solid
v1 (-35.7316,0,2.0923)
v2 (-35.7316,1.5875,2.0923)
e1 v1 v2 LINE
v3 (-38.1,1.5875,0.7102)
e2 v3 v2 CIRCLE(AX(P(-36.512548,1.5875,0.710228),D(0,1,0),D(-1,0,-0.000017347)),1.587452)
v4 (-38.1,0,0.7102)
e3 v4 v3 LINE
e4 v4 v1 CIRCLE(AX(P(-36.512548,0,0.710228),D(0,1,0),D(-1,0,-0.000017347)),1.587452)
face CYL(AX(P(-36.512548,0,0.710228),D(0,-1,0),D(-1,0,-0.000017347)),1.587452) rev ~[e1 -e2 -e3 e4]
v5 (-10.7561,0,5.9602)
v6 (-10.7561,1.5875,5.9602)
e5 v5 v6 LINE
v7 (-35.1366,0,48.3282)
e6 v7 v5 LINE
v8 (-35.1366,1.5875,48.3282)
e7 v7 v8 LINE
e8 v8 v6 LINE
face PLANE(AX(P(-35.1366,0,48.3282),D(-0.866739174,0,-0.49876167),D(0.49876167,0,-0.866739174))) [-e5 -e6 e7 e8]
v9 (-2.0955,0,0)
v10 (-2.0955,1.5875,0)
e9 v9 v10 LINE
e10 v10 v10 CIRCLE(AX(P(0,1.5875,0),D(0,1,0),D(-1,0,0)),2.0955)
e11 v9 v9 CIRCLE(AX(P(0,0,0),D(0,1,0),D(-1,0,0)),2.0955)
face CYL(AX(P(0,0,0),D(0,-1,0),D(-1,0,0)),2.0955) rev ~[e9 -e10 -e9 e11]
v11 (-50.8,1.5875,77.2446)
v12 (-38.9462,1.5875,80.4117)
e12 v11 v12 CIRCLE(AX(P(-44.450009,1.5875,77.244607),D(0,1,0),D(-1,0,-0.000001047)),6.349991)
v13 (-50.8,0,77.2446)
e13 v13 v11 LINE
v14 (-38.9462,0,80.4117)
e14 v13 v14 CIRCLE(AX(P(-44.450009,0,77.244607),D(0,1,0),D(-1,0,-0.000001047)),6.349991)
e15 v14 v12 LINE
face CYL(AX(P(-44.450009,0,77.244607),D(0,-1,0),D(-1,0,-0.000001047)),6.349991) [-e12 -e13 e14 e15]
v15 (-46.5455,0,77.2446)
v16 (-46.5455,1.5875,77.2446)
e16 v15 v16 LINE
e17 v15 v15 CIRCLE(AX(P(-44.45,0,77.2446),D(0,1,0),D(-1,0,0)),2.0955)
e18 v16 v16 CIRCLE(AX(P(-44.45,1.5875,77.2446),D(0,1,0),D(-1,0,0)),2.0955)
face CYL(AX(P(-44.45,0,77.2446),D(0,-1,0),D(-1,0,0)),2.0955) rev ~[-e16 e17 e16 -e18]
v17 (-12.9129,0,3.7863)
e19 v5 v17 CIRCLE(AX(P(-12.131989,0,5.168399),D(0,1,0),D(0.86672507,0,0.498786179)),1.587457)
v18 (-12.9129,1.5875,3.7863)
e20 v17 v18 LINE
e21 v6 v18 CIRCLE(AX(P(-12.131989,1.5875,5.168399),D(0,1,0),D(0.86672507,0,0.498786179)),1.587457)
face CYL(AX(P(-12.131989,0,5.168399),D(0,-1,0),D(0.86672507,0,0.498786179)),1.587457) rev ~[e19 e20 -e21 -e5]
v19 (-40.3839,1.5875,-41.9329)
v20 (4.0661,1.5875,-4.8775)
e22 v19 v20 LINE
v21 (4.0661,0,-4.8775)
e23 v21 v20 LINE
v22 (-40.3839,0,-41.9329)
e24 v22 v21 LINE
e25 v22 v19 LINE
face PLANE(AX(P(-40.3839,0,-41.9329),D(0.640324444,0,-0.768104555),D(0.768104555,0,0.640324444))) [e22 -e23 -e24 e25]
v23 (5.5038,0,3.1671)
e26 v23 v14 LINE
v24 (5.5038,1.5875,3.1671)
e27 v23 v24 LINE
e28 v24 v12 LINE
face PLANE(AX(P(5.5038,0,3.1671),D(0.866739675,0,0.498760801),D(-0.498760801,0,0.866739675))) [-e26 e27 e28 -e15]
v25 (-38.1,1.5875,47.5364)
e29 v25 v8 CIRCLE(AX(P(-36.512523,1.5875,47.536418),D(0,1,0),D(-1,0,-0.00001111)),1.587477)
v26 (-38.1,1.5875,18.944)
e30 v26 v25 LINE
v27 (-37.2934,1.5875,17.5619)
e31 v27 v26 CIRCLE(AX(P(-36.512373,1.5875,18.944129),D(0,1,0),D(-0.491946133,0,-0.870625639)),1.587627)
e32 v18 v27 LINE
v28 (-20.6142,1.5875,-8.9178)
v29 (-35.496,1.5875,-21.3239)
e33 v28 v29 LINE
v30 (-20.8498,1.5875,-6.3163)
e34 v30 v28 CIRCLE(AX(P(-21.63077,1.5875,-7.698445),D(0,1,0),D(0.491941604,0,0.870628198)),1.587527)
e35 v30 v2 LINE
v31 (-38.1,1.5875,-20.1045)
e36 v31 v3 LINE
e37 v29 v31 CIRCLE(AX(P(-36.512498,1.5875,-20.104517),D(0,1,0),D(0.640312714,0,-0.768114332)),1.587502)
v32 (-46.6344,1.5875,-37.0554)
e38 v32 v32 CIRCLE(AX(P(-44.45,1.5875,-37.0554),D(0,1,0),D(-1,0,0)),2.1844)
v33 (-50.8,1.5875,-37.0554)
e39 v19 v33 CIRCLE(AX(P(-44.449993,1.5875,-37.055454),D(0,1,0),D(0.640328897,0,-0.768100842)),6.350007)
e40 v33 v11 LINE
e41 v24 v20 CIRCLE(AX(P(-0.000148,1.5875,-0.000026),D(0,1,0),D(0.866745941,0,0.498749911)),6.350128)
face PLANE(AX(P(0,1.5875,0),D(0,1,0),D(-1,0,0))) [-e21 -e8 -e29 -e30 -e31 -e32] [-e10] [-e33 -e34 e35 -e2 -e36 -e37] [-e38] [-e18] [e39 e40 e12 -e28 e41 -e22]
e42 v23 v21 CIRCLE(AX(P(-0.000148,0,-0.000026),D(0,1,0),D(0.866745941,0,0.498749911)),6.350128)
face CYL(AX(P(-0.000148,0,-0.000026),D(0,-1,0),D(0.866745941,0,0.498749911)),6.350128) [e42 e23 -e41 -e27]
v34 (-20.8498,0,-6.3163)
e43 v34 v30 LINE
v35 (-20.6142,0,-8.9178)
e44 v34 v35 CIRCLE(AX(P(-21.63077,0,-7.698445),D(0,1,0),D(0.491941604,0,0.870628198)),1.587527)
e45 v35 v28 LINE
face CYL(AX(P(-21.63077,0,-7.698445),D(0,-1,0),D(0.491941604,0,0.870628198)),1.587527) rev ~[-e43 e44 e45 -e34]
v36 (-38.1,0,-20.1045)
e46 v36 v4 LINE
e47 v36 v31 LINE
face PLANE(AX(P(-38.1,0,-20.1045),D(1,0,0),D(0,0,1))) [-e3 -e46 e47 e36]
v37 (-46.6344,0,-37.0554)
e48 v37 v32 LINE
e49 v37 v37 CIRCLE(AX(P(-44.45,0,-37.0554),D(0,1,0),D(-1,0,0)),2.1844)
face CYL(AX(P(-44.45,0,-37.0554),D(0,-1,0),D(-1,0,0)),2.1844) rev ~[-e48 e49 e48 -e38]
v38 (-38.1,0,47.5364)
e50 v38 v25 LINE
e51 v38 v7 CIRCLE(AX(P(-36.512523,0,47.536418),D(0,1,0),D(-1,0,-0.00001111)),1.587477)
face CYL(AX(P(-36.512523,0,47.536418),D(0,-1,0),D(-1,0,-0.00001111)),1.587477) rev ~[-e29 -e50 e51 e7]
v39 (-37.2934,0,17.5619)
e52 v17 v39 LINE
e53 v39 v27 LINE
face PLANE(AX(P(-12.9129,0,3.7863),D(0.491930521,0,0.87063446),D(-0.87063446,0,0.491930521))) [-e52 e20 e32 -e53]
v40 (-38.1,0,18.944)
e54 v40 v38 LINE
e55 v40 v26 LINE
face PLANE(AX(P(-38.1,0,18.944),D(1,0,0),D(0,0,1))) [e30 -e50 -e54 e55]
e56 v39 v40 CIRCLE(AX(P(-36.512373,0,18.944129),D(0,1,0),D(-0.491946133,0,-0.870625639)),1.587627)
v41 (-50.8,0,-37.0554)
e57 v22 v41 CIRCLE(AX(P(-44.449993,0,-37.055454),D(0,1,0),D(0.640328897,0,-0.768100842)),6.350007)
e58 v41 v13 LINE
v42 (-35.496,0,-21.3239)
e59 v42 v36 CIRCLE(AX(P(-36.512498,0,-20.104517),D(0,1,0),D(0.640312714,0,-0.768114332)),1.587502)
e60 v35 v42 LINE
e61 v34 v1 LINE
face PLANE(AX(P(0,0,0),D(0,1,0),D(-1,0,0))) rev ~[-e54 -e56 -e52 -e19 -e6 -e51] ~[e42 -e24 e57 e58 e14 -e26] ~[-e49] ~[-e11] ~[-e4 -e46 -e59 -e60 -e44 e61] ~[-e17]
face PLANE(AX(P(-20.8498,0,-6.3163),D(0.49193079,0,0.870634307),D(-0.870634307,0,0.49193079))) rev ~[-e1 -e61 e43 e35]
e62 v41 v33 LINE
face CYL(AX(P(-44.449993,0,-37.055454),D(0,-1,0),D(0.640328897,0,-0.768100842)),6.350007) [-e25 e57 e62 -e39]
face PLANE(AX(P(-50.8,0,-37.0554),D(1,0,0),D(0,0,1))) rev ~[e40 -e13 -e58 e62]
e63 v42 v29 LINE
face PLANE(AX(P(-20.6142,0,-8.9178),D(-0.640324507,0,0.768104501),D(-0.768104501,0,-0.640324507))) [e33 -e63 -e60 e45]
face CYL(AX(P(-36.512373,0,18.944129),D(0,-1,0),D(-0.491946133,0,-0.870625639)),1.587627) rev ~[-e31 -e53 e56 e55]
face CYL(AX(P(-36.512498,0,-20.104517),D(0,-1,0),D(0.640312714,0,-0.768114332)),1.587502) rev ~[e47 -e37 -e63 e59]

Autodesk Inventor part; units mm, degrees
ref_plane "YZ Plane" through (0, 0, 0) normal (1, 0, 0) x (0, 1, 0)
ref_plane "XZ Plane" through (0, 0, 0) normal (0, 1, 0) x (-1, 0, 0)
ref_plane "XY Plane" through (0, 0, 0) normal (0, 0, 1) x (1, 0, 0)
sketch "main" plane through (0, 0, 0) normal (0, 0, 1) x (1, 0, 0)
  arc A0 (21.831, -6.1969) -> (19.4626, -4.8147) centre (20.2435, -6.1969) ccw
  line L0 (4.5808, -13.2233) -> (19.4626, -4.8147)
  circle A1 centre (-16.269, -6.907) radius 2.0955
  arc A2 (-21.7728, -3.7399) -> (-20.3351, -11.7845) centre (-16.269, -6.907) ccw
  line L1 (34.531, -43.9625) -> (34.531, 70.3375)
  arc A3 (-5.5129, -0.9469) -> (-3.356, -3.1208) centre (-4.137, -1.7387) ccw
  line L2 (-3.356, -3.1208) -> (21.0244, 10.6548)
  arc A4 (21.0244, 10.6548) -> (21.831, 12.037) centre (20.2435, 12.037) ccw
  line L3 (21.831, 12.037) -> (21.831, 40.6294)
  line L4 (18.8676, 41.4212) -> (-5.5129, -0.9469)
  line L5 (-21.7728, -3.7399) -> (22.6772, 73.5046)
  arc A5 (21.831, 40.6294) -> (18.8676, 41.4212) centre (20.2435, 40.6294) ccw
  circle A6 centre (28.181, 70.3375) radius 2.0955
  arc A7 (34.531, 70.3375) -> (22.6772, 73.5046) centre (28.181, 70.3375) ccw
  circle A8 centre (28.181, -43.9625) radius 2.1844
  arc A9 (24.1149, -48.84) -> (34.531, -43.9625) centre (28.181, -43.9625) ccw
  line L6 (24.1149, -48.84) -> (-20.3351, -11.7845)
  arc A10 (4.5808, -13.2233) -> (4.3452, -15.8248) centre (5.3617, -14.6055) ccw
  line L7 (21.831, -27.0116) -> (21.831, -6.1969)
  arc A11 (19.227, -28.2309) -> (21.831, -27.0116) centre (20.2435, -27.0116) ccw
  line L8 (4.3452, -15.8248) -> (19.227, -28.2309)
  point P0 (5.1171, -4.3382)
  point P1 (1.8899, -30.3122)
  point P2 (11.7861, -22.0279)
  dimension "d1" = 12.7
  dimension "d2" = 12.7
  dimension "d3" = 12.7
  dimension "d4" = 1.5875
  dimension "d5" = 12.7
  dimension "d6" = 1.5875
  dimension "d7" = 1.5875
  dimension "d10" = 114.3
  dimension "d12" = 12.7
  dimension "d13" = 12.7
  dimension "d14" = 13.187
  dimension "d16" = 44.45
  dimension "d17" = 12.7
sketch "Sketch1" plane through (0, 0, 0) normal (0, 1, 0) x (-1, 0, 0)
  arc A0 (38.1, 0.7102) -> (35.7316, 2.0923) centre (36.5125, 0.7102) ccw
  line L0 (20.8498, -6.3163) -> (35.7316, 2.0923)
  circle A1 centre (0, 0) radius 2.0955
  arc A2 (-5.5038, 3.1671) -> (-4.0661, -4.8775) centre (0, 0) ccw
  line L1 (50.8, -37.0554) -> (50.8, 77.2446)
  arc A3 (10.7561, 5.9602) -> (12.9129, 3.7863) centre (12.132, 5.1684) ccw
  line L2 (12.9129, 3.7863) -> (37.2934, 17.5619)
  arc A4 (37.2934, 17.5619) -> (38.1, 18.944) centre (36.5125, 18.944) ccw
  line L3 (38.1, 18.944) -> (38.1, 47.5364)
  line L4 (35.1366, 48.3282) -> (10.7561, 5.9602)
  line L5 (-5.5038, 3.1671) -> (38.9462, 80.4117)
  arc A5 (38.1, 47.5364) -> (35.1366, 48.3282) centre (36.5125, 47.5364) ccw
  circle A6 centre (44.45, 77.2446) radius 2.0955
  arc A7 (50.8, 77.2446) -> (38.9462, 80.4117) centre (44.45, 77.2446) ccw
  circle A8 centre (44.45, -37.0554) radius 2.1844
  arc A9 (40.3839, -41.9329) -> (50.8, -37.0554) centre (44.45, -37.0554) ccw
  line L6 (40.3839, -41.9329) -> (-4.0661, -4.8775)
  arc A10 (20.8498, -6.3163) -> (20.6142, -8.9178) centre (21.6307, -7.6984) ccw
  line L7 (38.1, -20.1045) -> (38.1, 0.7102)
  arc A11 (35.496, -21.3239) -> (38.1, -20.1045) centre (36.5125, -20.1045) ccw
  line L8 (20.6142, -8.9178) -> (35.496, -21.3239)
extrude "Extrusion1" add sketch "Sketch1" along normal blind 1.5875
properties part number "gusset" material "Acetal Resin, White"
